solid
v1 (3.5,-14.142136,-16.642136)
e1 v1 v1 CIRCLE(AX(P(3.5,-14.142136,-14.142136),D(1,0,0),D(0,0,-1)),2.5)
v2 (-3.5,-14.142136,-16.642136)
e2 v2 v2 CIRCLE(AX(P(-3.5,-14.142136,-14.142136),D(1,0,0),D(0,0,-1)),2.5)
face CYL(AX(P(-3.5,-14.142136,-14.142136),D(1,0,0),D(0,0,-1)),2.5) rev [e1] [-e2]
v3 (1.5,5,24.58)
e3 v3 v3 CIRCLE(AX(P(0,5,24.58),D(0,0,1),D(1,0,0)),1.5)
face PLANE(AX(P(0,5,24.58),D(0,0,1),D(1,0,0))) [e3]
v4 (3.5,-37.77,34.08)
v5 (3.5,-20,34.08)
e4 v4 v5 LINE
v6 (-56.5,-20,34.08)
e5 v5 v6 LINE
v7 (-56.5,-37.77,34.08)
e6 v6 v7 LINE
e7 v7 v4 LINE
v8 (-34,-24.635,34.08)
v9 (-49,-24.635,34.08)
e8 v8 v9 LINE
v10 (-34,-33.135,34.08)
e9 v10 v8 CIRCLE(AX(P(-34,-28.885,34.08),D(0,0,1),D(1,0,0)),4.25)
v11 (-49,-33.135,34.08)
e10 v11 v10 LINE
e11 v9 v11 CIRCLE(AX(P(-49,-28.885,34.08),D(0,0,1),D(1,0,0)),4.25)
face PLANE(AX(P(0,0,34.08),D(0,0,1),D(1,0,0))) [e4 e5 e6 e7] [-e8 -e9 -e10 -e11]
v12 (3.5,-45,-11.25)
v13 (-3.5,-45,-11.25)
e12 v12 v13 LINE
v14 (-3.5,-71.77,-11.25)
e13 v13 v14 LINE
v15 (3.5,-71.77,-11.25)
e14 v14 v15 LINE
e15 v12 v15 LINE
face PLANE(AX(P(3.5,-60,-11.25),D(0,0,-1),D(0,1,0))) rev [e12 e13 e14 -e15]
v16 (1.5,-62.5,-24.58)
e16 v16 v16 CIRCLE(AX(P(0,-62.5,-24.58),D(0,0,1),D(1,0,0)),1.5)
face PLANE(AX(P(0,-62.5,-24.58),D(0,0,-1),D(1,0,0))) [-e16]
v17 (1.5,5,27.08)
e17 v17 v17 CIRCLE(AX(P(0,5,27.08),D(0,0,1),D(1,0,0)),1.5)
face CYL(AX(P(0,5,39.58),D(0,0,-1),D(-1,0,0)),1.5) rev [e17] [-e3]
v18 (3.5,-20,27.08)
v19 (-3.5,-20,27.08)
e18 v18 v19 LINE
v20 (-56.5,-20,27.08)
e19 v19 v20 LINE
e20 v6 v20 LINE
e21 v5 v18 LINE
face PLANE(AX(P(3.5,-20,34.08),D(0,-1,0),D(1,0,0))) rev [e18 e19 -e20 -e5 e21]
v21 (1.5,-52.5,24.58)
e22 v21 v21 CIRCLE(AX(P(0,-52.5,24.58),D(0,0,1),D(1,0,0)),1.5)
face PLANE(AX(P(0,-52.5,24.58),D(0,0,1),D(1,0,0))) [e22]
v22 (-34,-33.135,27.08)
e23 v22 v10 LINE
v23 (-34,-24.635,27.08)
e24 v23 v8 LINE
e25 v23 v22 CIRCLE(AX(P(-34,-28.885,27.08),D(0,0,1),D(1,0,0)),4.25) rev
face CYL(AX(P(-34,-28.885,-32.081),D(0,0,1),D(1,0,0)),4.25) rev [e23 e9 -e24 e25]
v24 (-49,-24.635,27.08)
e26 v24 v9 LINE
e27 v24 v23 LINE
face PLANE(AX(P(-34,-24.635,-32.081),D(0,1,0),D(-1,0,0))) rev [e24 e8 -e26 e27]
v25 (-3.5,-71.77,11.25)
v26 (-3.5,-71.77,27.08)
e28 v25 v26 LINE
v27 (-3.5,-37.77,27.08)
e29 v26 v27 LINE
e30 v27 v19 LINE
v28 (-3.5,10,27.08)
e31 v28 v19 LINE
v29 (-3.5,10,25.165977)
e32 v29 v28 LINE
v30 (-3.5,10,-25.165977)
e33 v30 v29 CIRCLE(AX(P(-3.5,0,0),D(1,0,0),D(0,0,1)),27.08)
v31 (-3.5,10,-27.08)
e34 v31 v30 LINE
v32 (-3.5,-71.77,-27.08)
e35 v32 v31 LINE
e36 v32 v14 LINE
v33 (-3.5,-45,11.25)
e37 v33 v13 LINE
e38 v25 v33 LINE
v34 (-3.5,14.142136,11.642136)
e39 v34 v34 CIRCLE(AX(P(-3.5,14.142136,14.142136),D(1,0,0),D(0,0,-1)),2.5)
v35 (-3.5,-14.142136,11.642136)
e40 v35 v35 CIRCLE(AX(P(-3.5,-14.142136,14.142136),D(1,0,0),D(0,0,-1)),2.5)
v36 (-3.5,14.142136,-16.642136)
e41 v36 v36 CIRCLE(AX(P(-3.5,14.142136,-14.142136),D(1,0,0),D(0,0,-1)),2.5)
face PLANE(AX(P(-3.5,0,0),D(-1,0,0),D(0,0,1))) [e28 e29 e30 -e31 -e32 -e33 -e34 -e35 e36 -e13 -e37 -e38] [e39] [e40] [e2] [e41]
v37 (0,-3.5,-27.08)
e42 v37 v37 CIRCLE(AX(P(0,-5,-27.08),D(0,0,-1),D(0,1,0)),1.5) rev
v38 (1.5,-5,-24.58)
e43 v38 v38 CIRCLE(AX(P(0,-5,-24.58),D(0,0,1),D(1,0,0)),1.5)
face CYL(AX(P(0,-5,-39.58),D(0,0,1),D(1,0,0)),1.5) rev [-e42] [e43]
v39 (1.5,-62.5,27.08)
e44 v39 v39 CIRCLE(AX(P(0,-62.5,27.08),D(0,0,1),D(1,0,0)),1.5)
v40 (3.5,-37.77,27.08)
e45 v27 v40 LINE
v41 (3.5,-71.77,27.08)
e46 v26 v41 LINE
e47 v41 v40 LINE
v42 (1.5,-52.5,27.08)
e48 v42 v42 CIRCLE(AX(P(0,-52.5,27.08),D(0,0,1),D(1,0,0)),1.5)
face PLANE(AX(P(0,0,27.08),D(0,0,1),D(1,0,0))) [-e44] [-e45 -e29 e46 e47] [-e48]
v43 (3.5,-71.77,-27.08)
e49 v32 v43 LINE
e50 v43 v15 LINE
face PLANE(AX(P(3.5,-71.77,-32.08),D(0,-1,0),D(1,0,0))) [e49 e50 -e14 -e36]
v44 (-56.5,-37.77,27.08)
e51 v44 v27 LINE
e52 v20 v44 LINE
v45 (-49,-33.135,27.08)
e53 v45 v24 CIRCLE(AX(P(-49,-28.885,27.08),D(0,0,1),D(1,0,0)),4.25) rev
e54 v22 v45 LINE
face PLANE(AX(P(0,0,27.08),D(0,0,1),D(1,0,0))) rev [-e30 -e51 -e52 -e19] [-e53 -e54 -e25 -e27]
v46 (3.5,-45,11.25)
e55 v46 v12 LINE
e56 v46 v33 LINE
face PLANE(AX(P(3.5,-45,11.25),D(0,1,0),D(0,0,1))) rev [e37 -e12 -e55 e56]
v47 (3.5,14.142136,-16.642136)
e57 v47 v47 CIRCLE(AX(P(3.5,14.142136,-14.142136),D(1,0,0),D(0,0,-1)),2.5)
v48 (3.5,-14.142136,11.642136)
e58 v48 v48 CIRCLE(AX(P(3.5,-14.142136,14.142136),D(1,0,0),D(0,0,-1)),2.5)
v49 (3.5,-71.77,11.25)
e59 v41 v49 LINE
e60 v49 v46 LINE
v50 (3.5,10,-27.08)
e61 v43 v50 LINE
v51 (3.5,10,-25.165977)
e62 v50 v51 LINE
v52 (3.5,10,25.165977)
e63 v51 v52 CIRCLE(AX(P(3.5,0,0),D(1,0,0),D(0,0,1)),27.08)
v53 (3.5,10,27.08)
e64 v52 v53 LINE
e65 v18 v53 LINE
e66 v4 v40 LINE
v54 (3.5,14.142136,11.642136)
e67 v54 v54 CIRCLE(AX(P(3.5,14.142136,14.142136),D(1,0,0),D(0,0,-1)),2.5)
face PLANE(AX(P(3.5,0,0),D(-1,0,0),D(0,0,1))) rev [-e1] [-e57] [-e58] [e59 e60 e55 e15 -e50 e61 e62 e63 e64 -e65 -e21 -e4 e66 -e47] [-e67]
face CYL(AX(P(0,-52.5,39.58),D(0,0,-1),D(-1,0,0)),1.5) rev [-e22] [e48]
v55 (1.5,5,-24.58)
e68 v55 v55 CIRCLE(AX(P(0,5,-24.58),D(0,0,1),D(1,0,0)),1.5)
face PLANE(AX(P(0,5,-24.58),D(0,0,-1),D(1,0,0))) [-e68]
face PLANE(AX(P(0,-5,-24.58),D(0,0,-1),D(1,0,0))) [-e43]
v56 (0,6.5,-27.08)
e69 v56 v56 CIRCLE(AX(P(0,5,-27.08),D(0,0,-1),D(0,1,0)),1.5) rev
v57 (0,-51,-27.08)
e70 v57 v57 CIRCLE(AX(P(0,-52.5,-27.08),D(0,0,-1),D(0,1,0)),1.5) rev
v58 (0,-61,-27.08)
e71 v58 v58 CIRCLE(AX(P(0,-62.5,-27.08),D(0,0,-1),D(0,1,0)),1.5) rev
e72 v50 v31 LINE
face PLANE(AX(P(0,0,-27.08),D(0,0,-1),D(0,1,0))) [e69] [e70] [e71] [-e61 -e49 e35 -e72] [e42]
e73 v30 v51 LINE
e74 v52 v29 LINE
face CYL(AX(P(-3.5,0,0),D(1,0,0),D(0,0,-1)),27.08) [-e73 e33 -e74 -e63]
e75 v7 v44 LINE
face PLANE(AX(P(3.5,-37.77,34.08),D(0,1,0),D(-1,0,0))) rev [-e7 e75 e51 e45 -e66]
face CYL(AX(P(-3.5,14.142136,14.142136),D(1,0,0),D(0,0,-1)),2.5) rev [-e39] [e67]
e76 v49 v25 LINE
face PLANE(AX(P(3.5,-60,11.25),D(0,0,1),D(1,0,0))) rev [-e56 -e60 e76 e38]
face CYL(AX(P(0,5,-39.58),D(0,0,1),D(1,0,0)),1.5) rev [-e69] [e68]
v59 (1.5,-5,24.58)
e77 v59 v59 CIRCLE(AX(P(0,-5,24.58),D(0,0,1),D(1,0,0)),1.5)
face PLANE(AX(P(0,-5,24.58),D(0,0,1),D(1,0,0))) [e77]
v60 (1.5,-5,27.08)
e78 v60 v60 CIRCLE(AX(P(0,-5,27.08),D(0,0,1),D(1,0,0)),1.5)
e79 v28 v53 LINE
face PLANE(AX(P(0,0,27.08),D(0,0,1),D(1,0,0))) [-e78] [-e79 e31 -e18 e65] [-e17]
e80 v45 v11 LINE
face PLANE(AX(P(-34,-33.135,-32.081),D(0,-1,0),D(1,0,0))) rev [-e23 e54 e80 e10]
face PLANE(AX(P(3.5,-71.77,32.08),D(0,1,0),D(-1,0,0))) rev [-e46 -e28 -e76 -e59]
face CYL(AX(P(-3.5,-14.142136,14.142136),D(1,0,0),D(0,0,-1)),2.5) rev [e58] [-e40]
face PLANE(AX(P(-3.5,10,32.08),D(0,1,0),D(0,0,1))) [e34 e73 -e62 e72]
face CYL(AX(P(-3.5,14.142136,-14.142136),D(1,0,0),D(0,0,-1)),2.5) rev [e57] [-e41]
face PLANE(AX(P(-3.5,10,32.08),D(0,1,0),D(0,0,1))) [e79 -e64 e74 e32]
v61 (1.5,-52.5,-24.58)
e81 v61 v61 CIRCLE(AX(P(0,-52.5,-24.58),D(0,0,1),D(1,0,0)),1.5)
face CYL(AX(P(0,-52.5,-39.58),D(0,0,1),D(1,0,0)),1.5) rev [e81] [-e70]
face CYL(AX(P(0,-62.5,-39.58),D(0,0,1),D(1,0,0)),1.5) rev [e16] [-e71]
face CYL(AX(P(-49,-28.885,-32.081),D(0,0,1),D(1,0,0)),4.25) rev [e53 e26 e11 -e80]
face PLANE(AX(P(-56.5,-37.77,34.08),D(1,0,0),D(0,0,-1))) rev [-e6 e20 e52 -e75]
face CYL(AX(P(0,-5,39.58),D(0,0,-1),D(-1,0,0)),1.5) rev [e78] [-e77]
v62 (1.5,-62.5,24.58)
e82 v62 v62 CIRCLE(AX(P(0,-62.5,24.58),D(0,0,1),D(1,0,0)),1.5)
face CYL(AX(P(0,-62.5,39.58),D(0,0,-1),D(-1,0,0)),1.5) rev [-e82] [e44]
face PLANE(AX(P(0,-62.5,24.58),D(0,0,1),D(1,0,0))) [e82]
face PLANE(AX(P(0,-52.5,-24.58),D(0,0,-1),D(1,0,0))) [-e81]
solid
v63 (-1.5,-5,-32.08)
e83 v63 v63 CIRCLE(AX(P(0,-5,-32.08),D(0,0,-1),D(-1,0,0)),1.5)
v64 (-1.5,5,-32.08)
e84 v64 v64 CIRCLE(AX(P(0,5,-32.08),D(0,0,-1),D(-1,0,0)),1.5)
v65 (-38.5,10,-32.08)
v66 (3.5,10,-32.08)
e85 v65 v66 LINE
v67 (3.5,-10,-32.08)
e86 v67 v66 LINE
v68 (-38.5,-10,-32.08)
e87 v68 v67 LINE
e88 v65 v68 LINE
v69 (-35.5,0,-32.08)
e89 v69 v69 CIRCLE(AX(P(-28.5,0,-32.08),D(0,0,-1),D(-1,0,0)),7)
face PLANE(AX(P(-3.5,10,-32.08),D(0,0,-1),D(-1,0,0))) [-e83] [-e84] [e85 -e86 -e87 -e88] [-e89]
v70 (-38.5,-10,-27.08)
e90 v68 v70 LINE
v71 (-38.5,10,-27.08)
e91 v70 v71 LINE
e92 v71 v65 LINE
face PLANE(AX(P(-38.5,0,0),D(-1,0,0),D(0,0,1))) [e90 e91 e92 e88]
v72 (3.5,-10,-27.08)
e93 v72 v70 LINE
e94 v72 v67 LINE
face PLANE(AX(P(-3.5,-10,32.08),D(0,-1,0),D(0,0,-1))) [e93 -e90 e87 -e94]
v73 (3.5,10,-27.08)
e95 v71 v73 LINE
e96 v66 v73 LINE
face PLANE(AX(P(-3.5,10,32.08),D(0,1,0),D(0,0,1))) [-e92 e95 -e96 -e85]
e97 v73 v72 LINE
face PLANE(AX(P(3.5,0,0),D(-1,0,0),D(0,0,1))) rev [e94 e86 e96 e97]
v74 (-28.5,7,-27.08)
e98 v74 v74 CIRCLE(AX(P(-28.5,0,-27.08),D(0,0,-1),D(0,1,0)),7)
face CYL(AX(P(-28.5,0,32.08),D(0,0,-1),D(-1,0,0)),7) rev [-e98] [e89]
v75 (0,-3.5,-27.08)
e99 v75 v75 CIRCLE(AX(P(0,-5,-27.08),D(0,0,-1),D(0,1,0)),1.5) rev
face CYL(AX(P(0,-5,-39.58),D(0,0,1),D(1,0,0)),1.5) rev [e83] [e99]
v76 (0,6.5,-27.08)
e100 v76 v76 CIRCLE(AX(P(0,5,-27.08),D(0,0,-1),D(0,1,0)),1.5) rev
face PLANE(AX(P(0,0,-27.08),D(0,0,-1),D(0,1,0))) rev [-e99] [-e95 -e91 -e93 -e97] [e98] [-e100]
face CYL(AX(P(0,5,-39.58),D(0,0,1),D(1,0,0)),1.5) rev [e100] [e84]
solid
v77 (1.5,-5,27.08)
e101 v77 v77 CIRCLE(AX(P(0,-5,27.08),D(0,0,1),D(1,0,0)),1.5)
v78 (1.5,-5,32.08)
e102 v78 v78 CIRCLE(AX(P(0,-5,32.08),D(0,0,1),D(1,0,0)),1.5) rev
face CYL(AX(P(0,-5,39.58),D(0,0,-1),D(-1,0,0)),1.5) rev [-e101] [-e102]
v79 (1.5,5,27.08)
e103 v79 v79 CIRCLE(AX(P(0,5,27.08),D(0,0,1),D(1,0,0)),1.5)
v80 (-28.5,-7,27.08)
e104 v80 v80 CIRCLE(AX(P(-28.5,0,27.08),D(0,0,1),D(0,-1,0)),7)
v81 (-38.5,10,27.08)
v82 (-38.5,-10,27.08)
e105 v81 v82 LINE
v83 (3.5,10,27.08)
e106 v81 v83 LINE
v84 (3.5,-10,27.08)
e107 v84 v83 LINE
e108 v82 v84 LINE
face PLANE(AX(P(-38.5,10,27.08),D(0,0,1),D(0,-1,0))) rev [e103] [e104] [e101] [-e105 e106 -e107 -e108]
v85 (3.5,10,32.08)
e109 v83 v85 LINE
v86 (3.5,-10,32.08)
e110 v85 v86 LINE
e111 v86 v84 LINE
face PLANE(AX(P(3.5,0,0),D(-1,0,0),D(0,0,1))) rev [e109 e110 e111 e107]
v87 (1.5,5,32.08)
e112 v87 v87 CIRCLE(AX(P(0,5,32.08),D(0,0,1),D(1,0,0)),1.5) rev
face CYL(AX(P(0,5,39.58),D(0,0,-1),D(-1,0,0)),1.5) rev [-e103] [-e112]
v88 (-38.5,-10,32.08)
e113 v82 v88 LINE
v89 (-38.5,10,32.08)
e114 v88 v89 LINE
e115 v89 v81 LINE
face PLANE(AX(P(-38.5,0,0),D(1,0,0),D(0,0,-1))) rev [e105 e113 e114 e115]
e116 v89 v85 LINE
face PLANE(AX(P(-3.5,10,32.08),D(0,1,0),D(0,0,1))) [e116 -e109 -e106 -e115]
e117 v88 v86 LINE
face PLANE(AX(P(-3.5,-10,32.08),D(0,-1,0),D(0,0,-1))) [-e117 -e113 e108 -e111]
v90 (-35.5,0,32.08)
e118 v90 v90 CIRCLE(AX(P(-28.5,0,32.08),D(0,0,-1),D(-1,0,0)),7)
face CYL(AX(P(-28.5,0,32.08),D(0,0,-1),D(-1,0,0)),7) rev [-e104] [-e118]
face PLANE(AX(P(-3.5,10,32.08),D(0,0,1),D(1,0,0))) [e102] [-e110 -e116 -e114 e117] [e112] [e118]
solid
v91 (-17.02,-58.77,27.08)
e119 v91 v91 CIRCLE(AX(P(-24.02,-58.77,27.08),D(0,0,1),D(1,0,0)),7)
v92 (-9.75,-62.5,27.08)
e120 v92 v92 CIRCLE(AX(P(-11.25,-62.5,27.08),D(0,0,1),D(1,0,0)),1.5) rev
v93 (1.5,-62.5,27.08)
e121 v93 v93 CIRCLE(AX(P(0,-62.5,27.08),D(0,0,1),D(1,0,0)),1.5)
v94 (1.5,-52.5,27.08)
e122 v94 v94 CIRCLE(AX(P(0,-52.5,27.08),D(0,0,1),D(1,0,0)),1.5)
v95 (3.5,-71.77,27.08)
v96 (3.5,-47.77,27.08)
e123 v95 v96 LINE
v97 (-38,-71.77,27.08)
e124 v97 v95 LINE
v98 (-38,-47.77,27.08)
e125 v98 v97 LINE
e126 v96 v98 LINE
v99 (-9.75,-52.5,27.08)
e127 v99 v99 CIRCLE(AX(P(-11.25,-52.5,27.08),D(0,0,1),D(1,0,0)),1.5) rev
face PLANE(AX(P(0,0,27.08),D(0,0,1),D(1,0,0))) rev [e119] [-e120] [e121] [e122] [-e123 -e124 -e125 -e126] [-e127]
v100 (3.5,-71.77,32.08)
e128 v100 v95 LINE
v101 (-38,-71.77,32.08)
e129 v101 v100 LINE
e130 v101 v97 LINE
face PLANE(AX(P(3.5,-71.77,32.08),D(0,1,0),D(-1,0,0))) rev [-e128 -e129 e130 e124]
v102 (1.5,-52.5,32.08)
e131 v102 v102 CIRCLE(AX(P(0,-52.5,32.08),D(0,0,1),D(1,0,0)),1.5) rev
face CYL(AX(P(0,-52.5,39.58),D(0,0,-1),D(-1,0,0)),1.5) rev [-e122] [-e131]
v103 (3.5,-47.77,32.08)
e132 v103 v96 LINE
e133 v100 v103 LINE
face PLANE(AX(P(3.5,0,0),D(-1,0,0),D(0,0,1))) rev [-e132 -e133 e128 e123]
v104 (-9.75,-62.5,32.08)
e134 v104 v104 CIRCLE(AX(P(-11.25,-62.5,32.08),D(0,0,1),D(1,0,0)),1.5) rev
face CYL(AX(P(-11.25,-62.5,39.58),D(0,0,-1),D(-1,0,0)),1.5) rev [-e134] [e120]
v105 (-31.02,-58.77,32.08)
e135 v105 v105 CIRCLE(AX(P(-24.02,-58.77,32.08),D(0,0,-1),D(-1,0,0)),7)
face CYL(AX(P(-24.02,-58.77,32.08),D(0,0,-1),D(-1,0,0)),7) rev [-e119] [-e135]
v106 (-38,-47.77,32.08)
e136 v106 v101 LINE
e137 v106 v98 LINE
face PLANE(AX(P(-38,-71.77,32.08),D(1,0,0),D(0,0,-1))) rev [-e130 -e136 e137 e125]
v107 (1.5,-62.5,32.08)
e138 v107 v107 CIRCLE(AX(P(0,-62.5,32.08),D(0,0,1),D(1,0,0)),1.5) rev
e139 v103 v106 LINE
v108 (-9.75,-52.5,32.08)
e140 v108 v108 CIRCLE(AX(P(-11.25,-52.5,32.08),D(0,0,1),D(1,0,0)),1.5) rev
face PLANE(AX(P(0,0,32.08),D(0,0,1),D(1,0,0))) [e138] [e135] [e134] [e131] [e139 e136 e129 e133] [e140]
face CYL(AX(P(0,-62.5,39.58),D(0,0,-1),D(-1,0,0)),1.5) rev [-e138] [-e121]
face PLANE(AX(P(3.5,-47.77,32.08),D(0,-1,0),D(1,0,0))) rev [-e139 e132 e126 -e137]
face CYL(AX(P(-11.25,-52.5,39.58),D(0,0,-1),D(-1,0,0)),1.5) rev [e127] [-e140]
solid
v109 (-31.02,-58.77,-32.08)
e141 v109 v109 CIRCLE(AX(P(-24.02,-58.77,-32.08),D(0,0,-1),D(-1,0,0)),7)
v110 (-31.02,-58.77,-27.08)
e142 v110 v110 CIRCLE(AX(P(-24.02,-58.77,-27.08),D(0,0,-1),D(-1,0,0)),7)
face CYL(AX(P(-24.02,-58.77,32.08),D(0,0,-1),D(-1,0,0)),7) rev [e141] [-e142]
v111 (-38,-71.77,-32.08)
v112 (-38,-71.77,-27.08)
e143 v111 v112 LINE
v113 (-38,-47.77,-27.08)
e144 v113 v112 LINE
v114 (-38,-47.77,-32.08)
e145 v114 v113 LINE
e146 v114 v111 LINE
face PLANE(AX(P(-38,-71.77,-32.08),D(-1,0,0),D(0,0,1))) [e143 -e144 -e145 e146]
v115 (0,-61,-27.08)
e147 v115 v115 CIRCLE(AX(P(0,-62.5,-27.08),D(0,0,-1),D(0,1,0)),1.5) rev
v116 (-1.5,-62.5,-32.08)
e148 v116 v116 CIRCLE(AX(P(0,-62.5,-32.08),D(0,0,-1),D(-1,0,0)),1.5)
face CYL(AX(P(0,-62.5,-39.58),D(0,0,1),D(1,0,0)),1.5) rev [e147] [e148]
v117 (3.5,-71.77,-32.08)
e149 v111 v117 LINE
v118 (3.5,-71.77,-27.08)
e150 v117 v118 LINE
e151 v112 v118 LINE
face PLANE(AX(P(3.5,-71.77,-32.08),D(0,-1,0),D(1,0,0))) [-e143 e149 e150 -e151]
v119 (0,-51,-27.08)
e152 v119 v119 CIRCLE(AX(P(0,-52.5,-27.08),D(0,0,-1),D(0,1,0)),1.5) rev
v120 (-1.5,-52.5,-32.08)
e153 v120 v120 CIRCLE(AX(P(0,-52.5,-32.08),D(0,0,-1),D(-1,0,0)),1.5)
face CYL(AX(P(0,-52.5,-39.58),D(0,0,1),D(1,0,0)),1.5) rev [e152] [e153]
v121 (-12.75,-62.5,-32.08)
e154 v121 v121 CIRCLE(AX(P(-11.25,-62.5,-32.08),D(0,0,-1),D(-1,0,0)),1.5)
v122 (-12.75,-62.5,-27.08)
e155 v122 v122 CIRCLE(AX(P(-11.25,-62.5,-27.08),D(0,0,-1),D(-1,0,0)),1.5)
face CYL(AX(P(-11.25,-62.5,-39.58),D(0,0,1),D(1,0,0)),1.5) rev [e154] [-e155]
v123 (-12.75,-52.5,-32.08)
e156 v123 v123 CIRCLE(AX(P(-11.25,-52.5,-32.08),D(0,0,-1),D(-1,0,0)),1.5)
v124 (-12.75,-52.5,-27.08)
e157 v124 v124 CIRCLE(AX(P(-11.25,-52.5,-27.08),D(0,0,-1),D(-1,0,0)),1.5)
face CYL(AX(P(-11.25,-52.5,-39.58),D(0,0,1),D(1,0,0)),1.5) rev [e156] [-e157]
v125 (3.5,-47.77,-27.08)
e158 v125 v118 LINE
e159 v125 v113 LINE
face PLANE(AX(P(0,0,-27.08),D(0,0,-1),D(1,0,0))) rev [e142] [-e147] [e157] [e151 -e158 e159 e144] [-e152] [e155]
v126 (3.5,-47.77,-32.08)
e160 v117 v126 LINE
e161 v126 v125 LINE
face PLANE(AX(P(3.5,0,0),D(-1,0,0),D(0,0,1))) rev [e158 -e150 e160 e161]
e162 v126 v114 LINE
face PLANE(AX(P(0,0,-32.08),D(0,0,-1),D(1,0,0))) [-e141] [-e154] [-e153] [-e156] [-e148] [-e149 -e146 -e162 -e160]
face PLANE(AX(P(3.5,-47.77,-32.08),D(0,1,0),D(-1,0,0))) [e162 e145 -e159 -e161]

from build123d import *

# Parameters (mm, degrees)
BOSS_EXTRUDE1_DEPTH      = 3.5
BOSS_EXTRUDE1_DEPTH_BACK = 3.5
SKETCH2_R                = 2.5
CUT_EXTRUDE1_DEPTH       = 67.199141988
BOSS_EXTRUDE2_DEPTH      = 3.5
BOSS_EXTRUDE2_DEPTH_BACK = 3.5
SKETCH3_W                = 64.16
SKETCH3_H                = 20
SKETCH5_W                = 5
SKETCH5_H                = 20
BOSS_EXTRUDE4_DEPTH      = 35
SKETCH6_R                = 7
CUT_EXTRUDE2_DEPTH       = 96.910143363
SKETCH7_W                = 22.5
SKETCH7_H                = 15
CUT_EXTRUDE3_DEPTH       = 77.512263069
SKETCH8_W                = 41.5
SKETCH8_H                = 24
BOSS_EXTRUDE5_DEPTH      = 5
CUT_EXTRUDE4_DEPTH       = 101.663243043
CUT_EXTRUDE4_DEPTH_BACK  = 101.663243043
SKETCH9_R                = 7
SKETCH17_W               = 7
SKETCH17_H               = 15.83
BOSS_EXTRUDE8_DEPTH      = 11.77
SKETCH13_W               = 60
SKETCH13_H               = 17.77
BOSS_EXTRUDE7_DEPTH      = 7
CUT_EXTRUDE5_REACH       = 114.784
SKETCH16_R               = 1.5
CUT_EXTRUDE6_DEPTH       = 7.5
SPLIT1_START             = 27.08
SPLIT1_OUTLINE_W         = 41.5
SPLIT1_OUTLINE_H         = 24
SPLIT1_OUTLINE_R         = 1.5
SPLIT1_OUTLINE_R_2       = 7
SPLIT1_DEPTH             = 5
SPLIT1_2_OUTLINE_W       = 42
SPLIT1_2_OUTLINE_H       = 20
SPLIT1_2_OUTLINE_R       = 1.5
SPLIT1_2_OUTLINE_R_2     = 7
SPLIT1_2_DEPTH           = 5
SPLIT1_3_OUTLINE_W       = 41.5
SPLIT1_3_OUTLINE_H       = 24
SPLIT1_3_OUTLINE_R       = 7
SPLIT1_3_OUTLINE_R_2     = 1.5
SPLIT1_3_OUTLINE_W_2     = 42
SPLIT1_3_OUTLINE_H_2     = 20
SPLIT1_3_DEPTH           = 5


# Read off the part's stored shape, not the designer's step: Split1
with BuildPart() as part:
    # Sketch1 → Boss-Extrude1 (new, two sides: drawn at the far end of the back side and taken through both)
    with BuildSketch(Plane(origin=(0, 0, 0), x_dir=(0, 0, -1), z_dir=(1, 0, 0)).offset(-BOSS_EXTRUDE1_DEPTH_BACK)):
        with BuildLine():
            Line((-27.08, 0), (-27.08, -60))
            Line((-27.08, -60), (27.08, -60))
            Line((27.08, -60), (27.08, 0))
            ThreePointArc((27.08, 0), (0, 27.08), (-27.08, 0))
        make_face()
    extrude(amount=BOSS_EXTRUDE1_DEPTH + BOSS_EXTRUDE1_DEPTH_BACK)

    # Sketch2 → Cut-Extrude1 (cut, through all)
    with BuildSketch(Plane(origin=(3.5, 0, 0), x_dir=(0, 0, -1), z_dir=(1, 0, 0))):
        with Locations((-14.142135624, 14.142135624)):
            Circle(SKETCH2_R)
        with Locations((14.142135624, 14.142135624)):
            Circle(SKETCH2_R)
        with Locations((14.142135624, -14.142135624)):
            Circle(SKETCH2_R)
        with Locations((-14.142135624, -14.142135624)):
            Circle(SKETCH2_R)
    extrude(amount=-CUT_EXTRUDE1_DEPTH, mode=Mode.SUBTRACT)

    # Sketch3 → Boss-Extrude2 (add, two sides: drawn at the far end of the back side and taken through both)
    with BuildSketch(Plane(origin=(0, 0, 0), x_dir=(0, 0, -1), z_dir=(1, 0, 0)).offset(-BOSS_EXTRUDE2_DEPTH_BACK)):
        Rectangle(SKETCH3_W, SKETCH3_H)
    extrude(amount=BOSS_EXTRUDE2_DEPTH + BOSS_EXTRUDE2_DEPTH_BACK)

    # Sketch5 → Boss-Extrude4 (add)
    with BuildSketch(Plane.ZY.offset(3.5)):
        with Locations((-29.58, 0)):
            Rectangle(SKETCH5_W, SKETCH5_H)
        with Locations((29.58, 0)):
            Rectangle(SKETCH5_W, SKETCH5_H)
    extrude(amount=BOSS_EXTRUDE4_DEPTH)

    # Sketch6 → Cut-Extrude2 (cut, through all)
    with BuildSketch(Plane(origin=(0, 0, -32.08), x_dir=(-1, 0, 0), z_dir=(0, 0, -1))):
        with Locations((28.5, 0)):
            Circle(SKETCH6_R)
    extrude(amount=-CUT_EXTRUDE2_DEPTH, mode=Mode.SUBTRACT)

    # Sketch7 → Cut-Extrude3 (cut, through all)
    with BuildSketch(Plane.ZY.offset(3.5)):
        with Locations((0, -52.5)):
            Rectangle(SKETCH7_W, SKETCH7_H)
    extrude(amount=-CUT_EXTRUDE3_DEPTH, mode=Mode.SUBTRACT)

    # Sketch8 → Boss-Extrude5 (add)
    with BuildSketch(Plane.XY.offset(27.08)):
        with Locations((-17.25, -59.77)):
            Rectangle(SKETCH8_W, SKETCH8_H)
    boss_extrude5 = extrude(amount=BOSS_EXTRUDE5_DEPTH)

    # Mirror1: Boss-Extrude5 across plane
    add(boss_extrude5.mirror(Plane.XY))

    # Sketch9 → Cut-Extrude4 (cut, two sides: drawn at the far end of the back side and taken through both)
    with BuildSketch(Plane(origin=(0, 0, 27.08), x_dir=(-1, 0, 0), z_dir=(0, 0, -1)).offset(-CUT_EXTRUDE4_DEPTH_BACK)):
        with Locations((24.02, -58.77)):
            Circle(SKETCH9_R)
    extrude(amount=CUT_EXTRUDE4_DEPTH + CUT_EXTRUDE4_DEPTH_BACK, mode=Mode.SUBTRACT)

    # Sketch17 → Boss-Extrude8 (add)
    with BuildSketch(Plane.XZ.offset(60)):
        with Locations((0, 19.165)):
            Rectangle(SKETCH17_W, SKETCH17_H)
        with Locations((0, -19.165)):
            Rectangle(SKETCH17_W, SKETCH17_H)
    extrude(amount=BOSS_EXTRUDE8_DEPTH)

    # Sketch13 → Boss-Extrude7 (add)
    with BuildSketch(Plane.XY.offset(27.08)):
        with Locations((-26.5, -28.885)):
            Rectangle(SKETCH13_W, SKETCH13_H)
    extrude(amount=BOSS_EXTRUDE7_DEPTH)

    # Sketch15 → Cut-Extrude5 (cut, up to next)
    with BuildSketch(Plane.XY.offset(34.08), mode=Mode.PRIVATE) as cut_extrude5_sk1:
        with BuildLine():
            Line((-34, -33.135), (-49, -33.135))
            ThreePointArc((-49, -33.135), (-53.25, -28.885), (-49, -24.635))
            Line((-49, -24.635), (-34, -24.635))
            ThreePointArc((-34, -24.635), (-29.75, -28.885), (-34, -33.135))
        make_face()
    cut_extrude5_tool1 = extrude(cut_extrude5_sk1.sketch, amount=-CUT_EXTRUDE5_REACH, mode=Mode.PRIVATE) & part.part
    add(cut_extrude5_tool1.solids().sort_by_distance((-41.5, -28.885, 34.08))[0], mode=Mode.SUBTRACT)

    # Sketch16 → Cut-Extrude6 (cut, symmetric)
    with BuildSketch(Plane.XY.offset(32.08)):
        with Locations((0, 5)):
            Circle(SKETCH16_R)
        with Locations((0, -5)):
            Circle(SKETCH16_R)
        with Locations((0, -52.5)):
            Circle(SKETCH16_R)
        with Locations((0, -62.5)):
            Circle(SKETCH16_R)
        with Locations((-11.25, -52.5)):
            Circle(SKETCH16_R)
        with Locations((-11.25, -62.5)):
            Circle(SKETCH16_R)
    cut_extrude6 = extrude(amount=CUT_EXTRUDE6_DEPTH, both=True, mode=Mode.SUBTRACT)

    # Mirror3: Cut-Extrude6 across plane
    add(cut_extrude6.mirror(Plane.XY), mode=Mode.SUBTRACT)

    # Split1 3 outline → Split1 3 (cut)
    # profile 1 of 2: a face of its own
    with BuildSketch(Plane.XY.offset(SPLIT1_START)):
        with Locations((-17.25, -59.77)):
            Rectangle(SPLIT1_3_OUTLINE_W, SPLIT1_3_OUTLINE_H)
        with Locations((-24.02, -58.77)):
            Circle(SPLIT1_3_OUTLINE_R, mode=Mode.SUBTRACT)
        with Locations((-11.25, -62.5)):
            Circle(SPLIT1_3_OUTLINE_R_2, mode=Mode.SUBTRACT)
        with Locations((-11.25, -52.5)):
            Circle(SPLIT1_3_OUTLINE_R_2, mode=Mode.SUBTRACT)
        with Locations((0, -62.5)):
            Circle(SPLIT1_3_OUTLINE_R_2, mode=Mode.SUBTRACT)
        with Locations((0, -52.5)):
            Circle(SPLIT1_3_OUTLINE_R_2, mode=Mode.SUBTRACT)
    # profile 2 of 2: a face of its own
    with BuildSketch(Plane.XY.offset(SPLIT1_START)):
        with Locations((-17.5, 0)):
            Rectangle(SPLIT1_3_OUTLINE_W_2, SPLIT1_3_OUTLINE_H_2)
        with Locations((-28.5, 0)):
            Circle(SPLIT1_3_OUTLINE_R, mode=Mode.SUBTRACT)
        with Locations((0, -5)):
            Circle(SPLIT1_3_OUTLINE_R_2, mode=Mode.SUBTRACT)
        with Locations((0, 5)):
            Circle(SPLIT1_3_OUTLINE_R_2, mode=Mode.SUBTRACT)
    extrude(amount=SPLIT1_3_DEPTH, mode=Mode.SUBTRACT)


with BuildPart() as body_2:
    # Split1 outline → Split1 (new body)
    with BuildSketch(Plane.XY.offset(SPLIT1_START)):
        with Locations((-17.25, -59.77)):
            Rectangle(SPLIT1_OUTLINE_W, SPLIT1_OUTLINE_H)
        with Locations((-11.25, -62.5)):
            Circle(SPLIT1_OUTLINE_R, mode=Mode.SUBTRACT)
        with Locations((0, -62.5)):
            Circle(SPLIT1_OUTLINE_R, mode=Mode.SUBTRACT)
        with Locations((-24.02, -58.77)):
            Circle(SPLIT1_OUTLINE_R_2, mode=Mode.SUBTRACT)
        with Locations((-11.25, -52.5)):
            Circle(SPLIT1_OUTLINE_R, mode=Mode.SUBTRACT)
        with Locations((0, -52.5)):
            Circle(SPLIT1_OUTLINE_R, mode=Mode.SUBTRACT)
    extrude(amount=SPLIT1_DEPTH)


with BuildPart() as body_3:
    # Split1 2 outline → Split1 2 (new body)
    with BuildSketch(Plane.XY.offset(SPLIT1_START)):
        with Locations((-17.5, 0)):
            Rectangle(SPLIT1_2_OUTLINE_W, SPLIT1_2_OUTLINE_H)
        with Locations((0, -5)):
            Circle(SPLIT1_2_OUTLINE_R, mode=Mode.SUBTRACT)
        with Locations((-28.5, 0)):
            Circle(SPLIT1_2_OUTLINE_R_2, mode=Mode.SUBTRACT)
        with Locations((0, 5)):
            Circle(SPLIT1_2_OUTLINE_R, mode=Mode.SUBTRACT)
    extrude(amount=SPLIT1_2_DEPTH)


with BuildPart() as body_4:
    # Split2: the piece on the far side of the plane
    add(part.part)
    split(bisect_by=Plane(origin=(0, 0, -27.08), x_dir=(0, -1, 0), z_dir=(0, 0, -1)), keep=Keep.BOTTOM)


with BuildPart() as part_1:
    add(part.part)

    # Split2
    split(bisect_by=Plane(origin=(0, 0, -27.08), x_dir=(0, -1, 0), z_dir=(0, 0, -1)), keep=Keep.TOP)


solid = Compound([body_2.part, body_3.part, body_4.part, part_1.part])
